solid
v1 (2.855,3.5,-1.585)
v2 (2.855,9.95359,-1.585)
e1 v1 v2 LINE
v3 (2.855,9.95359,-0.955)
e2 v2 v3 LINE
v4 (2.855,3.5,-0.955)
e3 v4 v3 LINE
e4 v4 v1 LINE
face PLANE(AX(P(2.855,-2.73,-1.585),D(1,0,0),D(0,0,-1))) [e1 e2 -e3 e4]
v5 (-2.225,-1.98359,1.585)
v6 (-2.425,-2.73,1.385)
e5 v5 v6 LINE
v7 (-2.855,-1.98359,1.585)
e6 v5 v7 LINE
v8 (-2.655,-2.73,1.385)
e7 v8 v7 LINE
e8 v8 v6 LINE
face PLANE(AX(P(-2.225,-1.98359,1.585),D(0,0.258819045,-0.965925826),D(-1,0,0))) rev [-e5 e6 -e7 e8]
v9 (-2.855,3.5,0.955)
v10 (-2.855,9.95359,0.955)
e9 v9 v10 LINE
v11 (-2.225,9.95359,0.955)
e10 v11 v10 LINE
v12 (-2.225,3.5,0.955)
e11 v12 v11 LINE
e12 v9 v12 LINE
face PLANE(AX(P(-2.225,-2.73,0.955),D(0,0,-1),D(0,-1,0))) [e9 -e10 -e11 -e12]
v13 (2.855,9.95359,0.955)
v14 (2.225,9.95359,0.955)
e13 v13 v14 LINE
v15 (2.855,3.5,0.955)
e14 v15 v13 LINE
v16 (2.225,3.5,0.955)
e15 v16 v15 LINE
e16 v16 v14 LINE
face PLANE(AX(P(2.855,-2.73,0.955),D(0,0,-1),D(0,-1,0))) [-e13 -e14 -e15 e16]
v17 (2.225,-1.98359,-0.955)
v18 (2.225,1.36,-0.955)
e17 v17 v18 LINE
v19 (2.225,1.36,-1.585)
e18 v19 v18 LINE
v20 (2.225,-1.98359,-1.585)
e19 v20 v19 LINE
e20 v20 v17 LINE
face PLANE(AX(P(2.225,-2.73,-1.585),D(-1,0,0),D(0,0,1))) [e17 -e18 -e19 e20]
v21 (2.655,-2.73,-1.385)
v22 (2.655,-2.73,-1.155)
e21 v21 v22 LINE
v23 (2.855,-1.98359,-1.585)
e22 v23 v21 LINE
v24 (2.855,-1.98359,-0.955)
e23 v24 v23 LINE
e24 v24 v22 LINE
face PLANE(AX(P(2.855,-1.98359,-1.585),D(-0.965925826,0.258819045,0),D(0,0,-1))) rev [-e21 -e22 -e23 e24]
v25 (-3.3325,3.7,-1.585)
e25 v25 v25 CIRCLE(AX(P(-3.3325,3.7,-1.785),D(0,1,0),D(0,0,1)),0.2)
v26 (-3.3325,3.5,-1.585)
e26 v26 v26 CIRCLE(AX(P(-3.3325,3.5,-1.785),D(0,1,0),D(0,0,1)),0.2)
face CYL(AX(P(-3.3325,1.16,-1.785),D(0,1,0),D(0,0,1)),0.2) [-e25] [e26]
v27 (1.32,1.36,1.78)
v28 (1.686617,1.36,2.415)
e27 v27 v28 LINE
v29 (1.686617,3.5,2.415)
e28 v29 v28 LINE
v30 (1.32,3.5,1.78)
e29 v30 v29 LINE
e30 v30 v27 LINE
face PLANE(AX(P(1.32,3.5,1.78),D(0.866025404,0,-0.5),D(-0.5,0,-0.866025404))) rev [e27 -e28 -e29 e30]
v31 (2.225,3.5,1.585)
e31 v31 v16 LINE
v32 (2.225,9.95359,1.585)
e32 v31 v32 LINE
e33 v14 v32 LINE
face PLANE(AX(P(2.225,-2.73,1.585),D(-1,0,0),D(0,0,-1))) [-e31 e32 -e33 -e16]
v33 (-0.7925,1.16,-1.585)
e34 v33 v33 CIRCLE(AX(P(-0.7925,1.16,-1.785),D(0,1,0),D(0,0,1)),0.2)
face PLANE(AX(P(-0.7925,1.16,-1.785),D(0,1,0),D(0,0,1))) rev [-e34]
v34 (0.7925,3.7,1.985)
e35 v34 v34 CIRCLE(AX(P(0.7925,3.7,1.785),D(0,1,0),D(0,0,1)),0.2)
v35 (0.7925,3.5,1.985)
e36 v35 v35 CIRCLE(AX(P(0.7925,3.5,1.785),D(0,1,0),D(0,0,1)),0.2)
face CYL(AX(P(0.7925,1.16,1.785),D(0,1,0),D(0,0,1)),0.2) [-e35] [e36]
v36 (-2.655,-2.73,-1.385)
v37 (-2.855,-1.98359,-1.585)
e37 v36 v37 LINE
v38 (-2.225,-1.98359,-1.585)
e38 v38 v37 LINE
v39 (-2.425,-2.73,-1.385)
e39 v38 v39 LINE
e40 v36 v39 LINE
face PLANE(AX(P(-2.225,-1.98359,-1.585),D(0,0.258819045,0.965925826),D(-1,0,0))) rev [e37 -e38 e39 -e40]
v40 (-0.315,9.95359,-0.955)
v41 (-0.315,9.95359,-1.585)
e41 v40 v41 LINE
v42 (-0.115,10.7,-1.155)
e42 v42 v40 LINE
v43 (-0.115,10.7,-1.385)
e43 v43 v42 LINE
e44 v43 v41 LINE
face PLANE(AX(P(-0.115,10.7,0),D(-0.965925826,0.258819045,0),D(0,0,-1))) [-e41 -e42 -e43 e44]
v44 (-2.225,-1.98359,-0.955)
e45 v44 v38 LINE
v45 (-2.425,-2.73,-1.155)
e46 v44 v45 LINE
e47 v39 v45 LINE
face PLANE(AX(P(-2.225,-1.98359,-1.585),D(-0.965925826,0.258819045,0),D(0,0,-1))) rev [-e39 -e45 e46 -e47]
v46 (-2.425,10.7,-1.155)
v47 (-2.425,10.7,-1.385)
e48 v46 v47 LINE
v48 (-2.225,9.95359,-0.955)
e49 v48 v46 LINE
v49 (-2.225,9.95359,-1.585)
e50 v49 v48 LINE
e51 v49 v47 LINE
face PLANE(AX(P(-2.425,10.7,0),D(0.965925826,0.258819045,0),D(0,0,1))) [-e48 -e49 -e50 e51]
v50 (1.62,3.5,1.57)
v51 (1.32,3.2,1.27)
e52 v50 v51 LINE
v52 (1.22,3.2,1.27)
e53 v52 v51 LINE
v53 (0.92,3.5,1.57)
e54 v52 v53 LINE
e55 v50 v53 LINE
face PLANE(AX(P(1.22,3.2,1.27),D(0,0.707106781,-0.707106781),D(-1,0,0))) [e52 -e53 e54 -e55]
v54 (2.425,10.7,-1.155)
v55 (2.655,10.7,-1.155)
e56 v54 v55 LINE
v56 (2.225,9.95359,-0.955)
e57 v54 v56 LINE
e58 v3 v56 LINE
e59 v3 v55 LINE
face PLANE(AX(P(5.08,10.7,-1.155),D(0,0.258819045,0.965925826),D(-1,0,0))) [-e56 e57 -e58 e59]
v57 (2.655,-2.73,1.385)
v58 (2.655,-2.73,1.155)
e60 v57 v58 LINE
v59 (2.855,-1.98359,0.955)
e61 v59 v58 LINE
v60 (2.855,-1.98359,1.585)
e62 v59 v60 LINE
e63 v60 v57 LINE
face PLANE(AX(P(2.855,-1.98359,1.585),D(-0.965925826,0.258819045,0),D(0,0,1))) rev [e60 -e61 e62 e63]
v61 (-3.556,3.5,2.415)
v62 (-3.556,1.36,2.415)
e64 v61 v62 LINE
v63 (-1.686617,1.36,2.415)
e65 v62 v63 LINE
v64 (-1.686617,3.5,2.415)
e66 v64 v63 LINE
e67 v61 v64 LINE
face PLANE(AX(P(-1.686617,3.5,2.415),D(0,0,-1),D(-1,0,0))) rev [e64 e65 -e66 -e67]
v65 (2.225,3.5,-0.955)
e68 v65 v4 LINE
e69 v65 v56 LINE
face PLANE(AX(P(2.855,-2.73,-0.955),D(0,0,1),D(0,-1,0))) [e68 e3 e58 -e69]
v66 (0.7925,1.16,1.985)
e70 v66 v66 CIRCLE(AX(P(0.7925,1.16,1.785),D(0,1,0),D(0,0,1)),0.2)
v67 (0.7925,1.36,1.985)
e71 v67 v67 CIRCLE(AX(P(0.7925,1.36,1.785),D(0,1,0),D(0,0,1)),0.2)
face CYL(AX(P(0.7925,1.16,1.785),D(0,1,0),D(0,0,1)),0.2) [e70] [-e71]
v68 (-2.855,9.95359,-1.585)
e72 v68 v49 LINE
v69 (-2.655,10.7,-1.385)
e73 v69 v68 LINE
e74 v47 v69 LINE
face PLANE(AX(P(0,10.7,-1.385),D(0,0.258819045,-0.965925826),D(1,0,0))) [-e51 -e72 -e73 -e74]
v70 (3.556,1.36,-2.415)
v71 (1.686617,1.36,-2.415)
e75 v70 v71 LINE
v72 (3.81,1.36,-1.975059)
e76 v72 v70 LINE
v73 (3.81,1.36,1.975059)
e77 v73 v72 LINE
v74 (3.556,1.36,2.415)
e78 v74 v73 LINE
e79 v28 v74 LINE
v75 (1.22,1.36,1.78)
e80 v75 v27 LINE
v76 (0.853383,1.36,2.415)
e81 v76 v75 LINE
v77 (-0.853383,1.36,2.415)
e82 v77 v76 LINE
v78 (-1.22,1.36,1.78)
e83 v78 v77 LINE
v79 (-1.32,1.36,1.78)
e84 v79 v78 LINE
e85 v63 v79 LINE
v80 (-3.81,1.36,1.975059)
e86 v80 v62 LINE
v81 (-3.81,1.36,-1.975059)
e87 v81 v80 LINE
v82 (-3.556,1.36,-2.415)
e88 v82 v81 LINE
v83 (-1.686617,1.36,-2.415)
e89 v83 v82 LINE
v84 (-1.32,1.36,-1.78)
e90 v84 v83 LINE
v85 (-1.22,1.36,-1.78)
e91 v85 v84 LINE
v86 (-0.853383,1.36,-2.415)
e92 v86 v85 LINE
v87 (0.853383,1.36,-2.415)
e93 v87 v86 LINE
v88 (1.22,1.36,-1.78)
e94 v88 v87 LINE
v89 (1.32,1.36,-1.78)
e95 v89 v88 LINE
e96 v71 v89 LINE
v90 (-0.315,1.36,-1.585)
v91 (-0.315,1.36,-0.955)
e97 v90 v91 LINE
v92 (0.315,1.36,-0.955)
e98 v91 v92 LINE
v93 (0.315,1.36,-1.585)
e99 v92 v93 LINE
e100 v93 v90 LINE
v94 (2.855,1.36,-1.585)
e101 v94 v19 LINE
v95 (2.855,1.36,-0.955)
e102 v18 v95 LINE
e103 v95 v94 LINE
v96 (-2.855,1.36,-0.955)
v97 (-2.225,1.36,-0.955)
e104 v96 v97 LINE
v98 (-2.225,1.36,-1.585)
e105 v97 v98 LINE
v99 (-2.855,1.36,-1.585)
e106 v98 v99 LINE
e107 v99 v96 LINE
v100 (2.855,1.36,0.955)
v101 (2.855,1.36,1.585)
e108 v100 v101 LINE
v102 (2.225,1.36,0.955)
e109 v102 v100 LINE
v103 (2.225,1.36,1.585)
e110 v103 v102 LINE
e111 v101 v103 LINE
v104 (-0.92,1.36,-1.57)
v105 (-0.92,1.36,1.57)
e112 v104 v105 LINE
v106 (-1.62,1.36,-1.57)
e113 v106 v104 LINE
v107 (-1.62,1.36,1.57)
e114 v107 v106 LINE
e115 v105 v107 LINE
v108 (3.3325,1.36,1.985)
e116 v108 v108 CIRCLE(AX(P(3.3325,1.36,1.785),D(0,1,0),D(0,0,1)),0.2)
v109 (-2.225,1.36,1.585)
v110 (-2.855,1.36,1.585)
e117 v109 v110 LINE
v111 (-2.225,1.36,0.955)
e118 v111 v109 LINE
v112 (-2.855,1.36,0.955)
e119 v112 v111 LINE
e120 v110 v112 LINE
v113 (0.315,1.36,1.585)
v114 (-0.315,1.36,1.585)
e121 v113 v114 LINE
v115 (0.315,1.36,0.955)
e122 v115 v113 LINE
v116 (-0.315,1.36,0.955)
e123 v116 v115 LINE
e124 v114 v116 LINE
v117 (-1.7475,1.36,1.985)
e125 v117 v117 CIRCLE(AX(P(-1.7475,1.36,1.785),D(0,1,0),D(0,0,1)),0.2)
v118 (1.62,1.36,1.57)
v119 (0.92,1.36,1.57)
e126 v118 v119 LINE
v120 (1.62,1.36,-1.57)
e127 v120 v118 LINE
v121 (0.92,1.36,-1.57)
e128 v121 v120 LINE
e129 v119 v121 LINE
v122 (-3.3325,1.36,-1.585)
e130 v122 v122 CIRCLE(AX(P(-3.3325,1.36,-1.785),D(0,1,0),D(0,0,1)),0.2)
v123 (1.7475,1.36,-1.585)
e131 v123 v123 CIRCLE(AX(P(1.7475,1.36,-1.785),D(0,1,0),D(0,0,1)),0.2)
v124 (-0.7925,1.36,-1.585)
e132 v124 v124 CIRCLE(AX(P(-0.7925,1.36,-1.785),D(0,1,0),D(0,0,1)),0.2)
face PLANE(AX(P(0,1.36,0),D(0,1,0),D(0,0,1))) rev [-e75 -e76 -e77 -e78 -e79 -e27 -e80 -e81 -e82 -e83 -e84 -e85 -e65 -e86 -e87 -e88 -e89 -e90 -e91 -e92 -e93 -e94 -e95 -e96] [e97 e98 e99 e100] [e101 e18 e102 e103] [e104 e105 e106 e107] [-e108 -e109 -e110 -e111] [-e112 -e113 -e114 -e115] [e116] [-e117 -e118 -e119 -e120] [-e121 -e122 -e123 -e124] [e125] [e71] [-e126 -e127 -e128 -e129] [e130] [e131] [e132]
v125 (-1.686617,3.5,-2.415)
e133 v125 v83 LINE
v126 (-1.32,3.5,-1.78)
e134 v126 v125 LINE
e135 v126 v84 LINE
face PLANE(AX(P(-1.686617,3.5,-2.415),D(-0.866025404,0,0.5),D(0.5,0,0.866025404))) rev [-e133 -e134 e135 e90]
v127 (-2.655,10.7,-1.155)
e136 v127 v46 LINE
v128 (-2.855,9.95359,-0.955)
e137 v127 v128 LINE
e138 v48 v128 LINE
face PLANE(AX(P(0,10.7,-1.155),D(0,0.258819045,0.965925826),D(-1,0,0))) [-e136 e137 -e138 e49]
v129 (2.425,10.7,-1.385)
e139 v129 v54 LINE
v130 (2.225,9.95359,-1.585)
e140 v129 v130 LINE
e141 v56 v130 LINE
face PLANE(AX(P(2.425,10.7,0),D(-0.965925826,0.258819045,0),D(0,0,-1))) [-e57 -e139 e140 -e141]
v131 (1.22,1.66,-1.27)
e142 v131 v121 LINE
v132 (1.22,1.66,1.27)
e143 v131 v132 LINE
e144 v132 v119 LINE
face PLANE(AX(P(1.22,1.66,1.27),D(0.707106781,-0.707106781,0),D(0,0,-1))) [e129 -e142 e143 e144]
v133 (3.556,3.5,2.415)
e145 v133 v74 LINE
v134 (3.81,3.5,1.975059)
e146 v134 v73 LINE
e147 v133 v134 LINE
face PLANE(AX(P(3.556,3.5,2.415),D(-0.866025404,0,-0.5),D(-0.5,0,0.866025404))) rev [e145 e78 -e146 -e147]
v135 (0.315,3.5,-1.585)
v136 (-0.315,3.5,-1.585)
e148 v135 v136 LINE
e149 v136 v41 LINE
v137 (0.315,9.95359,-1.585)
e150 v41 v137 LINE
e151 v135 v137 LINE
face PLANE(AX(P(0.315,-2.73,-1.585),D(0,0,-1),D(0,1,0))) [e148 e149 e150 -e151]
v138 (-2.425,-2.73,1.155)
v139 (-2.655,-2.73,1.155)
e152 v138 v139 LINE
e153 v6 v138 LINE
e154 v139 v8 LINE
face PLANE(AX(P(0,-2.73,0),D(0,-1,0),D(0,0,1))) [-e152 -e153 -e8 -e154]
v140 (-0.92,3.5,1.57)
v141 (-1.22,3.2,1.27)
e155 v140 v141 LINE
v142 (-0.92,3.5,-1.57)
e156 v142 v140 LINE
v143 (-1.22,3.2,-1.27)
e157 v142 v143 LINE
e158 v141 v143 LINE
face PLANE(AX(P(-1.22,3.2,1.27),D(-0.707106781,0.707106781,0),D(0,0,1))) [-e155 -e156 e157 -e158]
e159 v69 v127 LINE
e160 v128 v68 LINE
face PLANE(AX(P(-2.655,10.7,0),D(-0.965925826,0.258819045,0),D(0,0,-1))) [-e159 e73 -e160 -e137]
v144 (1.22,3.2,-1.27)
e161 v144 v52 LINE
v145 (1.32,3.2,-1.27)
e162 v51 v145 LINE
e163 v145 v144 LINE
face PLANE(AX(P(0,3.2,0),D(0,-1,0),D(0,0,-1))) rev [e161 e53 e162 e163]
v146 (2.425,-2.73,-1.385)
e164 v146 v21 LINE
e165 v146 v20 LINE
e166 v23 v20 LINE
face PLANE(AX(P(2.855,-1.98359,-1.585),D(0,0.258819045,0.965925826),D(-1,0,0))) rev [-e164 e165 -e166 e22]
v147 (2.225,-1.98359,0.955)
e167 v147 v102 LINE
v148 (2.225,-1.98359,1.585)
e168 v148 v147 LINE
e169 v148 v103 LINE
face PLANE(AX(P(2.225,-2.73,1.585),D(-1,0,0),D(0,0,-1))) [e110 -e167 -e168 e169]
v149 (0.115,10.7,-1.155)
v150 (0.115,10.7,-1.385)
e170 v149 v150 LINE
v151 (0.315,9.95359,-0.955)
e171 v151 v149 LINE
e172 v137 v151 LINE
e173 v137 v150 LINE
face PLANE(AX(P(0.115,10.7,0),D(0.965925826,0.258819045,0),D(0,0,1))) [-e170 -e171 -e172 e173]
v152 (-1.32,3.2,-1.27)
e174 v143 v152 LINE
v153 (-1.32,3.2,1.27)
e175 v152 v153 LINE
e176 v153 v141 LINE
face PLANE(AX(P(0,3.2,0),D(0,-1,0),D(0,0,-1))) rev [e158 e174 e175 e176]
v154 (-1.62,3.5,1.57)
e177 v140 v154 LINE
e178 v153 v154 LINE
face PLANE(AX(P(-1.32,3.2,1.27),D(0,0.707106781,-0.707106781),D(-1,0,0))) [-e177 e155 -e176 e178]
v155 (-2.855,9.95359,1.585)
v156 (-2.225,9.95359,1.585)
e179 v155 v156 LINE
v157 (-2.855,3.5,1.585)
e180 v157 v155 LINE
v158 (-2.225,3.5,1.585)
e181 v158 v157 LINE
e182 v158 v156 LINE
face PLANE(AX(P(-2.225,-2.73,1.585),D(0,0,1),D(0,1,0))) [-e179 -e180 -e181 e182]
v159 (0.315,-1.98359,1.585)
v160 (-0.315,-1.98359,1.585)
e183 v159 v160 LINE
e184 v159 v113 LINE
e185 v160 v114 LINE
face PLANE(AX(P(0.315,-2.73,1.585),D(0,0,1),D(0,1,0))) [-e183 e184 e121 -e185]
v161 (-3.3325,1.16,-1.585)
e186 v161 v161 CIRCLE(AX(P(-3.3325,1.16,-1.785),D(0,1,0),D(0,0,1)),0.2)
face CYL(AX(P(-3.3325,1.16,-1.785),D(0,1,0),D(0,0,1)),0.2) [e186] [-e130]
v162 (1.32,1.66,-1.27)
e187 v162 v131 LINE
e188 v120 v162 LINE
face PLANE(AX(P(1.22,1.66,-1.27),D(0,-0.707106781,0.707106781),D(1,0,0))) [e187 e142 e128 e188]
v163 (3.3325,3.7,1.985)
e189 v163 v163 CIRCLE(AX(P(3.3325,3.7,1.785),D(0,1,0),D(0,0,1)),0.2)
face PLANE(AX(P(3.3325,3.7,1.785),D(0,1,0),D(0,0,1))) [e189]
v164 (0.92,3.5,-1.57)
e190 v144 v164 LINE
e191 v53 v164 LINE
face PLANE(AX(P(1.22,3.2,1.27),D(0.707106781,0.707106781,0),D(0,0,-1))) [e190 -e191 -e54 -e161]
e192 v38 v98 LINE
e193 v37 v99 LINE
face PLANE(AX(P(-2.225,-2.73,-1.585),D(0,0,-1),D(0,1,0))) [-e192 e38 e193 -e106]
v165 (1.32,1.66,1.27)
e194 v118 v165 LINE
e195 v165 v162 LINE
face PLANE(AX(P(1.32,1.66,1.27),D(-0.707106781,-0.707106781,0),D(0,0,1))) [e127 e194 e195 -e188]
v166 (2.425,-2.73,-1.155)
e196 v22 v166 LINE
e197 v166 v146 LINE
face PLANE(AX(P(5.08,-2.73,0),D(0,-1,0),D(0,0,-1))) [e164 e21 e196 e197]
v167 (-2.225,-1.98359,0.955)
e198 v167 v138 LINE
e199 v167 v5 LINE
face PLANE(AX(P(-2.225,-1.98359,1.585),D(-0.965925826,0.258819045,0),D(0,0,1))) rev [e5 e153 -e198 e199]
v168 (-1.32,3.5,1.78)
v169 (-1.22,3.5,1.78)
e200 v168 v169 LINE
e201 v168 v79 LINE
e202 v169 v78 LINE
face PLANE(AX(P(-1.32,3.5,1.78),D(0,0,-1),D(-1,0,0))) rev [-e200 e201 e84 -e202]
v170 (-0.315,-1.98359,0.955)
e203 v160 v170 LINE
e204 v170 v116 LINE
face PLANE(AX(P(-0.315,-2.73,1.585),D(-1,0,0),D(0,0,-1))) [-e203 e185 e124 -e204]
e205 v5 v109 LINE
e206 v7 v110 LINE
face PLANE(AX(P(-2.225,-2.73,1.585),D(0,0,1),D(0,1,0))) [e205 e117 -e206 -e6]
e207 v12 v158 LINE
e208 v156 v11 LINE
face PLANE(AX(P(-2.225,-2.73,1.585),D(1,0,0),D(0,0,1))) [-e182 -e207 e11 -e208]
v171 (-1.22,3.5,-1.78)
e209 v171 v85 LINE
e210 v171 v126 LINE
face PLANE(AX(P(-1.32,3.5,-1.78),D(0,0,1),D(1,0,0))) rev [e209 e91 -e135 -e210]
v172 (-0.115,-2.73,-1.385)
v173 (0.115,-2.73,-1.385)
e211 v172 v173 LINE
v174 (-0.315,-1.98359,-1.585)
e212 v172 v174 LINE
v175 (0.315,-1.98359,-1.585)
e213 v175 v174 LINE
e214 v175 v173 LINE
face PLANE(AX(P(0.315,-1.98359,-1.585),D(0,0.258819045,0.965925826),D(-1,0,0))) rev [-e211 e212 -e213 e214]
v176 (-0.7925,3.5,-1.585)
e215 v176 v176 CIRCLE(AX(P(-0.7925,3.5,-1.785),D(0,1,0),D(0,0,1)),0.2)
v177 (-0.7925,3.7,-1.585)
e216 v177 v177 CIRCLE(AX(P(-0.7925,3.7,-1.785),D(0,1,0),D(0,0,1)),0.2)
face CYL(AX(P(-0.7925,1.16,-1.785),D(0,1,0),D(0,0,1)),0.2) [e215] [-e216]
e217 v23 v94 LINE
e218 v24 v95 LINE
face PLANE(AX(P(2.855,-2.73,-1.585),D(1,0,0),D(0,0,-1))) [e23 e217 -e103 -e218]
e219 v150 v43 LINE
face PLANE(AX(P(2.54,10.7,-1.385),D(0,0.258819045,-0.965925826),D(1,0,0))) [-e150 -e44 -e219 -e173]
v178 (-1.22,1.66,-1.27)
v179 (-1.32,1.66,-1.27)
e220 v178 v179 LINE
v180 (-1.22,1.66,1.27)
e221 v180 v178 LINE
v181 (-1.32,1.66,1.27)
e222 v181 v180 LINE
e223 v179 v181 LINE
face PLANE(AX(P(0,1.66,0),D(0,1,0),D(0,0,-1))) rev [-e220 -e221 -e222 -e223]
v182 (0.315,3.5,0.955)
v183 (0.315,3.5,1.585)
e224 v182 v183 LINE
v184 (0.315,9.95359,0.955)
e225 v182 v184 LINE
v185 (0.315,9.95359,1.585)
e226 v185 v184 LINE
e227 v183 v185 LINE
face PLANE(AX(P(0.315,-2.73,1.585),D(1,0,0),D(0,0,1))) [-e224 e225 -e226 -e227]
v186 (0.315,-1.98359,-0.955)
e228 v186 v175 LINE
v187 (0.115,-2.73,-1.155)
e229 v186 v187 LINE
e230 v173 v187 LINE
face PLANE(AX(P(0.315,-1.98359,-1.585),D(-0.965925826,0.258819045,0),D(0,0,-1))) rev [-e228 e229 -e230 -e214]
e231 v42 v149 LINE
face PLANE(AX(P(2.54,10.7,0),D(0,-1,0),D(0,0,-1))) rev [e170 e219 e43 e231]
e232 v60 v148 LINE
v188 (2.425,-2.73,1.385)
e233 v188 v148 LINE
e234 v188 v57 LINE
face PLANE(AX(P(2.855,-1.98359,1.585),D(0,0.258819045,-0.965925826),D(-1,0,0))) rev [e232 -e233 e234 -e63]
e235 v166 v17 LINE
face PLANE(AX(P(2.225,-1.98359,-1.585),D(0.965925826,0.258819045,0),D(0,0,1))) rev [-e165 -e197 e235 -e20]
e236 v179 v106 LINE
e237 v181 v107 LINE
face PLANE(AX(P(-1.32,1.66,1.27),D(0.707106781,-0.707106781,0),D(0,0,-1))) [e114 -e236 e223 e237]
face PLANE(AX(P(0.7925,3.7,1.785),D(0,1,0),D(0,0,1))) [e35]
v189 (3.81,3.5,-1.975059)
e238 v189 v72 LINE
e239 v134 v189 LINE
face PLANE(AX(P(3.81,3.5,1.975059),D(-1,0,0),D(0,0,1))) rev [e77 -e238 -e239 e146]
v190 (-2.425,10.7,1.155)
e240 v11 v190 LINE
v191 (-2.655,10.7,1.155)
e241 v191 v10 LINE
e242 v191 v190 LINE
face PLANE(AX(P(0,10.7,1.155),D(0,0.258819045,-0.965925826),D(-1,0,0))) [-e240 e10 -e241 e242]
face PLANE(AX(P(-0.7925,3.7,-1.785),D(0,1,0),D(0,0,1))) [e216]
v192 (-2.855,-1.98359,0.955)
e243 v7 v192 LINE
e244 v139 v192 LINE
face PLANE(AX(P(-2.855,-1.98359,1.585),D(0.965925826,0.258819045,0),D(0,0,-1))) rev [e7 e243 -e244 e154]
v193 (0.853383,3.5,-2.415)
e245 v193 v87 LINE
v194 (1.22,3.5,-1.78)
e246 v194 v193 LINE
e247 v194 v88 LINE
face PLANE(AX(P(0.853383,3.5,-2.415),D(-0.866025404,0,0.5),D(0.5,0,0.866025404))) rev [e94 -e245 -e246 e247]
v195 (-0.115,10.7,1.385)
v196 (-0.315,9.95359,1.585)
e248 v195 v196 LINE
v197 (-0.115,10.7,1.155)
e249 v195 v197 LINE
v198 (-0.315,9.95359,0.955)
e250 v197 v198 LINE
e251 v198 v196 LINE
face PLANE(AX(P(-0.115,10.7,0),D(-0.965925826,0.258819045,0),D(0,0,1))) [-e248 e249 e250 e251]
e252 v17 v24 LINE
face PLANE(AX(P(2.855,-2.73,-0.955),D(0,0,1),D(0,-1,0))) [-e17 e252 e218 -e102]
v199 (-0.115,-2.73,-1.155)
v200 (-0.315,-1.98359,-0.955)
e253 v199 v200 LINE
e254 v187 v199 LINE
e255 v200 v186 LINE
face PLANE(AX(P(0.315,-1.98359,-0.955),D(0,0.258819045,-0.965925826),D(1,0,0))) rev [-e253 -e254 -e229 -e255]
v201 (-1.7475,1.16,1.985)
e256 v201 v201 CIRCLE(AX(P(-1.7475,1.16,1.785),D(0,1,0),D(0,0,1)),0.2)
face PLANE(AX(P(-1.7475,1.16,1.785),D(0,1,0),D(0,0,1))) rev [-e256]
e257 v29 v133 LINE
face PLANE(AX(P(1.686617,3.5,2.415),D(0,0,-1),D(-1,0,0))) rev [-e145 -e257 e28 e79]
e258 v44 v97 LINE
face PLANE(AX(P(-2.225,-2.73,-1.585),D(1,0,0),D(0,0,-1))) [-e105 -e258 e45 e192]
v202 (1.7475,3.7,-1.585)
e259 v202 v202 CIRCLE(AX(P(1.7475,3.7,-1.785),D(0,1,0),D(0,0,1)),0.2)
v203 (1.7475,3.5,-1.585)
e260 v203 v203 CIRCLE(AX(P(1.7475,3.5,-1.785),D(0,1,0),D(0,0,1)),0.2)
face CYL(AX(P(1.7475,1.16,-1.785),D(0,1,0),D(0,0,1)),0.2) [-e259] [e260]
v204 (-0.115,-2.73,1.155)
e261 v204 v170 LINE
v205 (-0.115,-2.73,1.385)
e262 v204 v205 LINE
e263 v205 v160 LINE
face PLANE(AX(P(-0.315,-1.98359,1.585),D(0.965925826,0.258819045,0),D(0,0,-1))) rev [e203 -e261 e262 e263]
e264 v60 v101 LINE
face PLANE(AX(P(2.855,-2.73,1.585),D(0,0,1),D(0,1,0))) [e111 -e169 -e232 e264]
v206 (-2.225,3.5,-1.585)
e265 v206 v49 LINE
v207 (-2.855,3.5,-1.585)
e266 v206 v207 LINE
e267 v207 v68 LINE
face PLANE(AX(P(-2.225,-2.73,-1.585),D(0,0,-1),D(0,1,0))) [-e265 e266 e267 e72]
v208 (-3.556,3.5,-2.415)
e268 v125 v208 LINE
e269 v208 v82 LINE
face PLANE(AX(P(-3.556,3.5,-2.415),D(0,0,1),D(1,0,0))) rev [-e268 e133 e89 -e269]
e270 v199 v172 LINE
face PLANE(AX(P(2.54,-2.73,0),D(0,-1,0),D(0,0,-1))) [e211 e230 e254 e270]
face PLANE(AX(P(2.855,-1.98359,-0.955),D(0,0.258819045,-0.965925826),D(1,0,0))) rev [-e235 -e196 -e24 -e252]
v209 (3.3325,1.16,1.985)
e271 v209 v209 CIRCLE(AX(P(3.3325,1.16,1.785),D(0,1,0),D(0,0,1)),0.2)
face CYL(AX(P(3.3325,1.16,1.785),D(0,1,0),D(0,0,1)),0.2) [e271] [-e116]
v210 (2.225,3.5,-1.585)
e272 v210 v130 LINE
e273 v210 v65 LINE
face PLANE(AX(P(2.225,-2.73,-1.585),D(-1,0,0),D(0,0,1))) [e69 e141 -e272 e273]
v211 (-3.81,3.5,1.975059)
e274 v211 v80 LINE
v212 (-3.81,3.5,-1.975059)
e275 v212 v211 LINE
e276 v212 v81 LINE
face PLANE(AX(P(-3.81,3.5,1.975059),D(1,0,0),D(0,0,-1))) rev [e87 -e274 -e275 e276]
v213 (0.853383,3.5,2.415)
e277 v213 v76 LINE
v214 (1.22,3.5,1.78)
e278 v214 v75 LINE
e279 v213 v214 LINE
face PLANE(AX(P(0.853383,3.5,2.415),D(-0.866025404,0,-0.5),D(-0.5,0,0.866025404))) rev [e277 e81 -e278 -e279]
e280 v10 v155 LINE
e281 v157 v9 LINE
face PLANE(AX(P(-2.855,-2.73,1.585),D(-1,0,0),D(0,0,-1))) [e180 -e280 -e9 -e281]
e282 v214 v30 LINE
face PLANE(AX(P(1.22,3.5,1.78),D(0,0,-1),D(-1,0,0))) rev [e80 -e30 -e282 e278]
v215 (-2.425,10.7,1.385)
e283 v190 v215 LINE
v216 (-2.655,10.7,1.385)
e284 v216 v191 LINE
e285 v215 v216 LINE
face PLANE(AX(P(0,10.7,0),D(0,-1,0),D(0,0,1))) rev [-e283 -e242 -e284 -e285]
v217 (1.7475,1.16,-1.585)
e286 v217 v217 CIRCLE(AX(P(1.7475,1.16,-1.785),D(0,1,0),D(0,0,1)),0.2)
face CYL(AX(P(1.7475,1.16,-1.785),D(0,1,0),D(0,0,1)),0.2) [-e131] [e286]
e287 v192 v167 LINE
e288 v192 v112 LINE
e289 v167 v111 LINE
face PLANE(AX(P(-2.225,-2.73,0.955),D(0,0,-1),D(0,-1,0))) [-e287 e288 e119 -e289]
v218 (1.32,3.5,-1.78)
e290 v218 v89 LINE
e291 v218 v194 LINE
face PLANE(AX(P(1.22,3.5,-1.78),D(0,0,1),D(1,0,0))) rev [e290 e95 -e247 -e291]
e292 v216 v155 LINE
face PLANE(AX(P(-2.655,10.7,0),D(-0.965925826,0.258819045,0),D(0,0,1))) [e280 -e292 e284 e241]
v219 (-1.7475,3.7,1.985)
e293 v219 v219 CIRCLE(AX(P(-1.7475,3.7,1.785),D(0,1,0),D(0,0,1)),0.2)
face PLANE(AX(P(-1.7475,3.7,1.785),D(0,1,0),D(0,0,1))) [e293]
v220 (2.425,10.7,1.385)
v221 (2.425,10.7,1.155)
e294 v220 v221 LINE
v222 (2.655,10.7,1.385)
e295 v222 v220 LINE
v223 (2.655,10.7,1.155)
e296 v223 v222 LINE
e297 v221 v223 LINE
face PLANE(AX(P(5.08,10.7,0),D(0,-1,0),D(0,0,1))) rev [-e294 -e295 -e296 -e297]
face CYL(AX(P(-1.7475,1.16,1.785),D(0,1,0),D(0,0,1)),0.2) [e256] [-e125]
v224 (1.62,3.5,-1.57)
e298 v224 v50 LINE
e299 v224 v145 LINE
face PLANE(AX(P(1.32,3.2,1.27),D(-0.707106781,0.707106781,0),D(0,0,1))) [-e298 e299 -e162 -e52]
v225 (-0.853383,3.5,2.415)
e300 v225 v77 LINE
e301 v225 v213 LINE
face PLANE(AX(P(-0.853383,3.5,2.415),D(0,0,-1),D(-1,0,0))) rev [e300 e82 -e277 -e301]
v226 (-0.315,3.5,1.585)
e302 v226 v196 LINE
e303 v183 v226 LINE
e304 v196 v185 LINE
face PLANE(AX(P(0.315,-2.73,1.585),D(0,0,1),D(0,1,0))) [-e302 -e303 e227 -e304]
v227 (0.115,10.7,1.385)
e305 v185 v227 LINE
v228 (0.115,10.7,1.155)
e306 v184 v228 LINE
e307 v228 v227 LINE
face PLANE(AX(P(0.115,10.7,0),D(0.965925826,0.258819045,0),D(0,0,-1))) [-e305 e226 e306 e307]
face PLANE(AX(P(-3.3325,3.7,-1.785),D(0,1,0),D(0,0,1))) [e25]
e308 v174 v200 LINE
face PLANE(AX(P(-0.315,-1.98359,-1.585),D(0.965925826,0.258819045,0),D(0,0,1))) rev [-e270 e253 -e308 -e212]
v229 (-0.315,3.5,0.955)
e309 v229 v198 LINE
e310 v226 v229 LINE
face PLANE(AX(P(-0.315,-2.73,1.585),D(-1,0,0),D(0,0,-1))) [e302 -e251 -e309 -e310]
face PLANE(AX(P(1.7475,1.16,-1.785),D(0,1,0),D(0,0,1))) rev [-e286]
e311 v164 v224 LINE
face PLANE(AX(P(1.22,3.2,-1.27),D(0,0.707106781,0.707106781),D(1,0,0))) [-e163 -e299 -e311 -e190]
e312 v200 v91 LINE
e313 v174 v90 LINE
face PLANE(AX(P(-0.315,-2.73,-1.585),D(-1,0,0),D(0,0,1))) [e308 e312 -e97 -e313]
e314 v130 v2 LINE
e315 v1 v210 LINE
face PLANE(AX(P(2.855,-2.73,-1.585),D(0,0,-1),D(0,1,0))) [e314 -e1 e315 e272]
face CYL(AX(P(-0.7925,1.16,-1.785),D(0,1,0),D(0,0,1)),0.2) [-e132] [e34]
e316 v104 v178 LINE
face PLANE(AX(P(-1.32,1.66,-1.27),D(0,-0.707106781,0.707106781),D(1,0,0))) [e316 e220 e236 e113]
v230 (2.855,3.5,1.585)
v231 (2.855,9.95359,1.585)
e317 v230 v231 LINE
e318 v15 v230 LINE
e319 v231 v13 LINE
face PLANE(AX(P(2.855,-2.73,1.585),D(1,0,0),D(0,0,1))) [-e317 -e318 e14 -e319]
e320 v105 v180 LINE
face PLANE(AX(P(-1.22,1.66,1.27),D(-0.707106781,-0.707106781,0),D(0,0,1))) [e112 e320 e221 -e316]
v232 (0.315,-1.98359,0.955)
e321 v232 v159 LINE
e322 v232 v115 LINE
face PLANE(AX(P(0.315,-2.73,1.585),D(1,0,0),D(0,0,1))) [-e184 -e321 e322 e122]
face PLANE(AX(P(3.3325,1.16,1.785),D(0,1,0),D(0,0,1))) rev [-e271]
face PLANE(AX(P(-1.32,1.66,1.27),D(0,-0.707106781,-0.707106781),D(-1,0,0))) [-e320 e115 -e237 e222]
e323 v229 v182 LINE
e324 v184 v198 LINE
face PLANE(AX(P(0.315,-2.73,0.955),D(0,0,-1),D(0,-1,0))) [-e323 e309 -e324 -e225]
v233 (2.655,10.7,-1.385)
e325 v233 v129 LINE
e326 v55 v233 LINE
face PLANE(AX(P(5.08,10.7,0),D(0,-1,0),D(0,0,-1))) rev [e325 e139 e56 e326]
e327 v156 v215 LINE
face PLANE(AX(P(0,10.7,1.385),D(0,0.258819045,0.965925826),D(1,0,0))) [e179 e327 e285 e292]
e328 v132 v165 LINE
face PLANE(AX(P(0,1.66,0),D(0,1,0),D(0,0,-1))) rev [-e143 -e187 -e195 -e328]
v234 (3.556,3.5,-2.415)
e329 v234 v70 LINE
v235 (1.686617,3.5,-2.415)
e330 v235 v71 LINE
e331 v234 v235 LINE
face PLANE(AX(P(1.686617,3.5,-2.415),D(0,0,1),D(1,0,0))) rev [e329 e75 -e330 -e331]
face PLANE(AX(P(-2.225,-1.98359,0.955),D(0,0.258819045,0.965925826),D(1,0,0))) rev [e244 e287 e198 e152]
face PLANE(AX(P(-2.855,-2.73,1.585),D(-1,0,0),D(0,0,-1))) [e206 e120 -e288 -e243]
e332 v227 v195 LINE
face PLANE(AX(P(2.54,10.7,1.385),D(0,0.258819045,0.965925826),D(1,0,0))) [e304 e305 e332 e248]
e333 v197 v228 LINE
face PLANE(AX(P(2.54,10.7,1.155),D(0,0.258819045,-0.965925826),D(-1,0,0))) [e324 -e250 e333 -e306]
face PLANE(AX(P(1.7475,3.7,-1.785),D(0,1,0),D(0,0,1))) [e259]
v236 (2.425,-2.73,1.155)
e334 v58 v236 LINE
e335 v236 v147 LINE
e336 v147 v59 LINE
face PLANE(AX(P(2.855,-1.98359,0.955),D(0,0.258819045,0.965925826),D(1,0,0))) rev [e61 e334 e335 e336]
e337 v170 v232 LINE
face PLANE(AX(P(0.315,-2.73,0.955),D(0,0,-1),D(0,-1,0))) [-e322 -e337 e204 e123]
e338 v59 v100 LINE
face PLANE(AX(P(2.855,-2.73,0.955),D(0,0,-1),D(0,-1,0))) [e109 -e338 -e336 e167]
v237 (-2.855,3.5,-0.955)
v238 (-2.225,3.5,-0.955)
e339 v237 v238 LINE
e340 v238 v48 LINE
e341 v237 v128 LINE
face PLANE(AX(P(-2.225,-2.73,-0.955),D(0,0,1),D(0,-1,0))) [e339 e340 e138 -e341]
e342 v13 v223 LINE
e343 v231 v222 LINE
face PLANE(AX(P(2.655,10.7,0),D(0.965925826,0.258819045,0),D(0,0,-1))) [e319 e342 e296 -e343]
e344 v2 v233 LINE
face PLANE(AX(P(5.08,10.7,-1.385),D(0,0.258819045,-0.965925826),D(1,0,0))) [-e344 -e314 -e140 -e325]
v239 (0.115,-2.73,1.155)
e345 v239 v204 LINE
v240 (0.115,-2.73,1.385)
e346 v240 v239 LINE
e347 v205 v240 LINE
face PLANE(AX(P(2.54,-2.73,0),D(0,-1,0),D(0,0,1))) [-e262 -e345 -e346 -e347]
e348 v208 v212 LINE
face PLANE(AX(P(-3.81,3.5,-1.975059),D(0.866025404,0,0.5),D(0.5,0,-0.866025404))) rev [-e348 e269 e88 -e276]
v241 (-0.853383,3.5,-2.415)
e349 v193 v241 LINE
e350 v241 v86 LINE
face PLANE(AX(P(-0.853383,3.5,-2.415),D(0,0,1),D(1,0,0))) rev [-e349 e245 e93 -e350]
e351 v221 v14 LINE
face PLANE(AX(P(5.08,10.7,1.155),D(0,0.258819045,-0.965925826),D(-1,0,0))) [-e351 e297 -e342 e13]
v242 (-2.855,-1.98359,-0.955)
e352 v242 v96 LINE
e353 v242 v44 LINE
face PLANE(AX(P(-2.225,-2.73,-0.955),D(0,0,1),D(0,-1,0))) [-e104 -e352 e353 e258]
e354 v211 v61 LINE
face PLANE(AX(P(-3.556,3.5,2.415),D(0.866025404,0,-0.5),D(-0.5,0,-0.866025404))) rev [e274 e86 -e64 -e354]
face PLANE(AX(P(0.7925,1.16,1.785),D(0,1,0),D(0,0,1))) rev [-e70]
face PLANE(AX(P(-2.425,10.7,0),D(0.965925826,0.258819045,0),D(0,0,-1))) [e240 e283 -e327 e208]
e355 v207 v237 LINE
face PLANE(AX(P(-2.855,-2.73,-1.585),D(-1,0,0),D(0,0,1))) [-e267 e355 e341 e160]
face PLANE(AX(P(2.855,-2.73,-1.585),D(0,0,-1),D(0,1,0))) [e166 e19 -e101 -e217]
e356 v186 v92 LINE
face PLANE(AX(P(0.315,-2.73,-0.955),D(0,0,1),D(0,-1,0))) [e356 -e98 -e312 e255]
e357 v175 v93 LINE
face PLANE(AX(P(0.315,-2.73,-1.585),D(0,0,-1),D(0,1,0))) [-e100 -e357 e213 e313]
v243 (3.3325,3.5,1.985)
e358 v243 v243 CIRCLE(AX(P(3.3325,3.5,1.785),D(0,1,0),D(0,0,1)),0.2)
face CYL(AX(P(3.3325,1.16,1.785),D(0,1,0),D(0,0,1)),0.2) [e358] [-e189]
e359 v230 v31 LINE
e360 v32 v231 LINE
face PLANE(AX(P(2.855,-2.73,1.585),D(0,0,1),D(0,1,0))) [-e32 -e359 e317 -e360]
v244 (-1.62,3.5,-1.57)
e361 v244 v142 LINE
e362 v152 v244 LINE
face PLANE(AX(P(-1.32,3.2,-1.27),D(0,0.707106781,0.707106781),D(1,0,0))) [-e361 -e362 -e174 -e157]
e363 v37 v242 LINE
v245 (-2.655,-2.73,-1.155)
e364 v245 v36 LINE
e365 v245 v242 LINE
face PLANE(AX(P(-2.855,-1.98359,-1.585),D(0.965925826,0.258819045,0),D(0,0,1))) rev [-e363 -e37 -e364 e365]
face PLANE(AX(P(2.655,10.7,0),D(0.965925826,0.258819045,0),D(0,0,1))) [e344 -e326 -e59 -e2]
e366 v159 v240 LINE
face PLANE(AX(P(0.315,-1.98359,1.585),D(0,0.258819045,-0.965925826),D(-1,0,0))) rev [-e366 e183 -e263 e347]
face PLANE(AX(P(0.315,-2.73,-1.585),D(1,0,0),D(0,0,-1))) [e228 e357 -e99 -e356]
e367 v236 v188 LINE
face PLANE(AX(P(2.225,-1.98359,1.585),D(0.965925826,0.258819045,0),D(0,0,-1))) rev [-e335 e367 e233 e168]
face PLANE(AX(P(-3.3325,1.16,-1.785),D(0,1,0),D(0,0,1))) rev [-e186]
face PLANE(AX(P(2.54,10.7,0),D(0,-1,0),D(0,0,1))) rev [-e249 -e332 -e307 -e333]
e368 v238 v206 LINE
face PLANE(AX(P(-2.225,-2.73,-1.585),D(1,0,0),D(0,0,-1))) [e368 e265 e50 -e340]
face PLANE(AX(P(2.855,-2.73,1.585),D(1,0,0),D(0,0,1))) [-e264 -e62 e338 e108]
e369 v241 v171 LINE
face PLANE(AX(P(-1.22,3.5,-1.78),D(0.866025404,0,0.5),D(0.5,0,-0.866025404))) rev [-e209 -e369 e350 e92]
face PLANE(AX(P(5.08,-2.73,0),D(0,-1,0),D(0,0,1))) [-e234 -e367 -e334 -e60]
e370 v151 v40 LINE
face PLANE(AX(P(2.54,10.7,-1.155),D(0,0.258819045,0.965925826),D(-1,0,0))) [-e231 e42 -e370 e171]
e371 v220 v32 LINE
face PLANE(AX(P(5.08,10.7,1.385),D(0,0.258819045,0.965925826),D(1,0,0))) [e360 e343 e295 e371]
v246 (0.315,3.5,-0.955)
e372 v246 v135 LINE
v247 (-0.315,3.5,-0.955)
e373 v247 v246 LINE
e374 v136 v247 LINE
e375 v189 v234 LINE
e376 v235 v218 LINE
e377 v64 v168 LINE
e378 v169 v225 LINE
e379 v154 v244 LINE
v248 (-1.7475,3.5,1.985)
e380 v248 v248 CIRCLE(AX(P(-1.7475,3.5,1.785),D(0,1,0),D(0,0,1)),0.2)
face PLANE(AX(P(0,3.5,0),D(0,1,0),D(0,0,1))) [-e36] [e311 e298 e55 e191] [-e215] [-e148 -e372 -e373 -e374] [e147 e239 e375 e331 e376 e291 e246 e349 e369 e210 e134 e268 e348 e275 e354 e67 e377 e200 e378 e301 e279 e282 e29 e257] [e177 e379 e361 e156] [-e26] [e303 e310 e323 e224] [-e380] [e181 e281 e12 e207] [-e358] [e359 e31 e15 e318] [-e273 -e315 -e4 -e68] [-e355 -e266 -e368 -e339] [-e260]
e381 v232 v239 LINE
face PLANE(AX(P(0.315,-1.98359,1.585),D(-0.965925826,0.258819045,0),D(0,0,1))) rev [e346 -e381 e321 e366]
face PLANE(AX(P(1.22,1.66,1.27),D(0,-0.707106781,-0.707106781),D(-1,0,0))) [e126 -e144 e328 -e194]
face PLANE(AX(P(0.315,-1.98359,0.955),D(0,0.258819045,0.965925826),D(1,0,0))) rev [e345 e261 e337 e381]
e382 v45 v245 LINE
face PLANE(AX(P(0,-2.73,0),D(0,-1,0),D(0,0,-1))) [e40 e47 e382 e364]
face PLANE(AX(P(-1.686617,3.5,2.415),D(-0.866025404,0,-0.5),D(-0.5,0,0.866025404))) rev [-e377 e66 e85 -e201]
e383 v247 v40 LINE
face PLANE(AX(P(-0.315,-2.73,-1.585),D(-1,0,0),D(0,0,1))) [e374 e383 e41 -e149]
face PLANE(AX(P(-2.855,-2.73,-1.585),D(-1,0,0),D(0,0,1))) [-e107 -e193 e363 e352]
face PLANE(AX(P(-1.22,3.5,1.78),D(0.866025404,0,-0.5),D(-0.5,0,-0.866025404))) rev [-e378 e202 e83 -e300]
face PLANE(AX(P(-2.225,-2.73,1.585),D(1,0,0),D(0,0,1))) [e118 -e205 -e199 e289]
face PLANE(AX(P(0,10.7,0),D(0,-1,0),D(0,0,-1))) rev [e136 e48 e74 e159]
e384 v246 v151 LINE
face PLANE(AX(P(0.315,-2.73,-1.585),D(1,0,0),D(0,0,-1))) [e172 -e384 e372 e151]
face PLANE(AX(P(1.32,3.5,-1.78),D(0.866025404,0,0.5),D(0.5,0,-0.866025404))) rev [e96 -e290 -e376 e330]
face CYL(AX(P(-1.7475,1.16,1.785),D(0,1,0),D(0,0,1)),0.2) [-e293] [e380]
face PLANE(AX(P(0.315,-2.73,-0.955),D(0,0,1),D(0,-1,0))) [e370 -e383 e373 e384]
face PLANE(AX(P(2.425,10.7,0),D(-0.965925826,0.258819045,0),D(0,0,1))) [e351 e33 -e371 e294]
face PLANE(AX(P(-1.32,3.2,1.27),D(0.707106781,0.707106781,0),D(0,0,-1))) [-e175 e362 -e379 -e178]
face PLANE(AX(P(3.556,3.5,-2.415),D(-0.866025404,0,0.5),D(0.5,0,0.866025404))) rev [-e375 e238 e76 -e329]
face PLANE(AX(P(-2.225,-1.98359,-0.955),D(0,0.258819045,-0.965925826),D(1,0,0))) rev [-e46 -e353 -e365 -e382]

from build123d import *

# Parameters (mm, degrees)
BOSS_EXTRUDE1_DEPTH      = 2.14
BOSS_EXTRUDE2_START      = -2.34
SKETCH2_R                = 0.2
BOSS_EXTRUDE2_DEPTH      = 2.54
LPATTERN1_COUNT          = 3
LPATTERN1_PITCH          = 2.54
SKETCH3_W                = 0.1
SKETCH3_H                = 2.54
CUT_EXTRUDE1_DEPTH       = 0.3
CHAMFER1_SIZE            = 0.3
CHAMFER1_OF_MIRROR2_SIZE = 0.3
SKETCH6_W                = 0.63
SKETCH6_H                = 0.63
CHAMFER2_SIZE            = 0.2
CHAMFER2_SIZE2           = 0.746410162
CHAMFER3_SIZE            = 0.2
CHAMFER3_SIZE2           = 0.746410162
LPATTERN2_START          = -1.585
LPATTERN2_DEPTH          = 0.63
LPATTERN2_START_2        = -1
LPATTERN2_2_DEPTH        = 5
MIRROR4_START            = -2.655
MIRROR4_DEPTH            = 0.23
MIRROR4_START_2          = -0.115
MIRROR4_2_DEPTH          = 0.23
MIRROR4_START_3          = 2.425
MIRROR4_3_DEPTH          = 0.23
MIRROR4_START_4          = 0.955
MIRROR4_4_DEPTH          = 0.63
MIRROR4_START_5          = -4
MIRROR4_5_DEPTH          = 8


with BuildPart() as part:
    # Sketch1 → Boss-Extrude1 (new body)
    with BuildSketch(Plane(origin=(0, 1.36, 0), x_dir=(1, 0, 0), z_dir=(0, 1, 0))):
        Polygon((-1.686617421, 2.415), (-1.32, 1.78), (-1.22, 1.78), (-0.853382579, 2.415), (0.853382579, 2.415), (1.22, 1.78), (1.32, 1.78), (1.686617421, 2.415), (3.556, 2.415), (3.81, 1.975059095), (3.81, -1.975059095), (3.556, -2.415), (1.686617421, -2.415), (1.32, -1.78), (1.22, -1.78), (0.853382579, -2.415), (-0.853382579, -2.415), (-1.22, -1.78), (-1.32, -1.78), (-1.686617421, -2.415), (-3.556, -2.415), (-3.81, -1.975059095), (-3.81, 1.975059095), (-3.556, 2.415), align=None)
    extrude(amount=BOSS_EXTRUDE1_DEPTH)

    # Sketch2 → Boss-Extrude2 (add)
    with BuildSketch(Plane(origin=(0, 3.5, 0), x_dir=(1, 0, 0), z_dir=(0, 1, 0)).offset(BOSS_EXTRUDE2_START)):
        with Locations(Location((-3.3325, 1.785, 0), (0, 0, 270))):
            Circle(SKETCH2_R)
        with Locations(Location((-1.7475, -1.785, 0), (0, 0, 270))):
            Circle(SKETCH2_R)
    boss_extrude2 = extrude(amount=BOSS_EXTRUDE2_DEPTH)

    # LPattern1: Boss-Extrude2 ×3
    with Locations(*[(i * LPATTERN1_PITCH, 0, 0) for i in range(1, LPATTERN1_COUNT)]):
        add(boss_extrude2)

    # Sketch3 → Cut-Extrude1 (cut)
    with BuildSketch(Plane(origin=(0, 3.5, 0), x_dir=(1, 0, 0), z_dir=(0, 1, 0))):
        with Locations((-1.27, 0)):
            Rectangle(SKETCH3_W, SKETCH3_H)
        with Locations((1.27, 0)):
            Rectangle(SKETCH3_W, SKETCH3_H)
    cut_extrude1 = extrude(amount=-CUT_EXTRUDE1_DEPTH, mode=Mode.SUBTRACT)

    # Chamfer1
    chamfer1_edges = [part.edges().sort_by_distance(p)[0] for p in [
        (-1.27, 3.5, 1.27),
        (-1.22, 3.5, 0),
        (-1.27, 3.5, -1.27),
        (-1.32, 3.5, 0),
        (1.27, 3.5, 1.27),
        (1.32, 3.5, 0),
        (1.22, 3.5, 0),
        (1.27, 3.5, -1.27),
    ]]
    chamfer(chamfer1_edges, length=CHAMFER1_SIZE - 0.0001)  # a hair under: the kernel refuses the full size

    # Mirror2: Cut-Extrude1 across plane
    add(cut_extrude1.mirror(Plane.ZX.offset(2.43)), mode=Mode.SUBTRACT)

    # Chamfer1 of Mirror2
    chamfer1_of_mirror2_edges = [part.edges().sort_by_distance(p)[0] for p in [
        (-1.27, 1.36, 1.27),
        (-1.22, 1.36, 0),
        (-1.27, 1.36, -1.27),
        (-1.32, 1.36, 0),
        (1.27, 1.36, 1.27),
        (1.32, 1.36, 0),
        (1.22, 1.36, 0),
        (1.27, 1.36, -1.27),
    ]]
    chamfer(chamfer1_of_mirror2_edges, length=CHAMFER1_OF_MIRROR2_SIZE - 0.0001)  # a hair under: the kernel refuses the full size

    # Sweep1: sweep along a path in Sketch5
    with BuildLine(Plane(origin=(-2.54, 0, 0), x_dir=(0, 0, -1), z_dir=(1, 0, 0))) as sweep1_path:
        Line((1.27, 10.7), (1.27, -2.73))
    # Sketch6 → Sweep1 (sweep)
    with BuildSketch(Plane(origin=(0, 10.7, 0), x_dir=(1, 0, 0), z_dir=(0, 1, 0))):
        with Locations((-2.54, 1.27)):
            Rectangle(SKETCH6_W, SKETCH6_H)
    sweep(path=sweep1_path.line)

    # Chamfer2
    chamfer2_edges = [part.edges().sort_by_distance(p)[0] for p in [
        (-2.225, -2.73, -1.27),
        (-2.54, -2.73, -0.955),
        (-2.855, -2.73, -1.27),
        (-2.54, -2.73, -1.585),
    ]]
    chamfer2_side = [part.faces().sort_by_distance(p)[0] for p in [
        (-2.54, -2.73, -1.27),
    ]]
    chamfer(chamfer2_edges, length=CHAMFER2_SIZE, length2=CHAMFER2_SIZE2, reference=chamfer2_side[0])

    # Chamfer3
    chamfer3_edges = [part.edges().sort_by_distance(p)[0] for p in [
        (-2.225, 10.7, -1.27),
        (-2.54, 10.7, -1.585),
        (-2.855, 10.7, -1.27),
        (-2.54, 10.7, -0.955),
    ]]
    chamfer3_side = [part.faces().sort_by_distance(p)[0] for p in [
        (-2.54, 10.7, -1.27),
    ]]
    chamfer(chamfer3_edges, length=CHAMFER3_SIZE, length2=CHAMFER3_SIZE2, reference=chamfer3_side[0])

    # LPattern2: read off the stored shape, not the designer's step
    # LPattern2 outline → LPattern2 (add)
    with BuildSketch(Plane.XY.offset(LPATTERN2_START)):
        Polygon((2.225, 9.953589838), (2.225, 3.5), (2.855, 3.5), (2.855, 9.953589838), (2.655, 10.7), (2.425, 10.7), align=None)
        Polygon((0.115, 10.7), (-0.115, 10.7), (-0.315, 9.953589838), (-0.315, 3.5), (0.315, 3.5), (0.315, 9.953589838), align=None)
        Polygon((-0.315, -1.983589838), (-0.115, -2.73), (0.115, -2.73), (0.315, -1.983589838), (0.315, 1.36), (-0.315, 1.36), align=None)
        Polygon((2.855, 1.36), (2.225, 1.36), (2.225, -1.983589838), (2.425, -2.73), (2.655, -2.73), (2.855, -1.983589838), align=None)
    extrude(amount=LPATTERN2_DEPTH)

    # LPattern2 2 outline → LPattern2 2 (cut)
    with BuildSketch(Plane.YZ.offset(LPATTERN2_START_2)):
        Polygon((-2.73, -0.955), (-2.73, -1.155), (-1.983589838, -0.955), align=None)
        Polygon((-1.983589838, -1.585), (-2.73, -1.385), (-2.73, -1.585), align=None)
        Polygon((9.953589838, -0.955), (10.7, -1.155), (10.7, -0.955), align=None)
        Polygon((10.7, -1.385), (9.953589838, -1.585), (10.7, -1.585), align=None)
    extrude(amount=LPATTERN2_2_DEPTH, mode=Mode.SUBTRACT)

    # Mirror4: read off the stored shape, not the designer's step
    # Mirror4 outline → Mirror4 (add)
    with BuildSketch(Plane.YZ.offset(MIRROR4_START)):
        Polygon((10.7, 1.155), (10.7, 1.385), (9.953589838, 1.585), (3.5, 1.585), (3.5, 0.955), (9.953589838, 0.955), align=None)
        Polygon((-1.983589838, 1.585), (-2.73, 1.385), (-2.73, 1.155), (-1.983589838, 0.955), (1.36, 0.955), (1.36, 1.585), align=None)
    extrude(amount=MIRROR4_DEPTH)

    # Mirror4 2 outline → Mirror4 2 (add)
    with BuildSketch(Plane.YZ.offset(MIRROR4_START_2)):
        Polygon((10.7, 1.155), (10.7, 1.385), (9.953589838, 1.585), (3.5, 1.585), (3.5, 0.955), (9.953589838, 0.955), align=None)
        Polygon((-1.983589838, 1.585), (-2.73, 1.385), (-2.73, 1.155), (-1.983589838, 0.955), (1.36, 0.955), (1.36, 1.585), align=None)
    extrude(amount=MIRROR4_2_DEPTH)

    # Mirror4 3 outline → Mirror4 3 (add)
    with BuildSketch(Plane.YZ.offset(MIRROR4_START_3)):
        Polygon((10.7, 1.155), (10.7, 1.385), (9.953589838, 1.585), (3.5, 1.585), (3.5, 0.955), (9.953589838, 0.955), align=None)
        Polygon((-1.983589838, 1.585), (-2.73, 1.385), (-2.73, 1.155), (-1.983589838, 0.955), (1.36, 0.955), (1.36, 1.585), align=None)
    extrude(amount=MIRROR4_3_DEPTH)

    # Mirror4 4 outline → Mirror4 4 (add)
    with BuildSketch(Plane.XY.offset(MIRROR4_START_4)):
        Polygon((-2.655, 1.36), (-2.855, 1.36), (-2.855, -1.983589838), (-2.655, -2.73), align=None)
        Polygon((2.855, 1.36), (2.655, 1.36), (2.655, -2.73), (2.855, -1.983589838), align=None)
        Polygon((2.425, 1.36), (2.225, 1.36), (2.225, -1.983589838), (2.425, -2.73), align=None)
        Polygon((0.315, 1.36), (0.115, 1.36), (0.115, -2.73), (0.315, -1.983589838), align=None)
        Polygon((-0.115, 1.36), (-0.315, 1.36), (-0.315, -1.983589838), (-0.115, -2.73), align=None)
        Polygon((-2.225, 1.36), (-2.425, 1.36), (-2.425, -2.73), (-2.225, -1.983589838), align=None)
        Polygon((-2.655, 10.7), (-2.855, 9.953589838), (-2.855, 3.5), (-2.655, 3.5), align=None)
        Polygon((2.655, 10.7), (2.655, 3.5), (2.855, 3.5), (2.855, 9.953589838), align=None)
        Polygon((2.225, 9.953589838), (2.225, 3.5), (2.425, 3.5), (2.425, 10.7), align=None)
        Polygon((0.115, 10.7), (0.115, 3.5), (0.315, 3.5), (0.315, 9.953589838), align=None)
        Polygon((-0.315, 9.953589838), (-0.315, 3.5), (-0.115, 3.5), (-0.115, 10.7), align=None)
        Polygon((-2.425, 10.7), (-2.425, 3.5), (-2.225, 3.5), (-2.225, 9.953589838), align=None)
    extrude(amount=MIRROR4_4_DEPTH)

    # Mirror4 5 outline → Mirror4 5 (cut)
    with BuildSketch(Plane.YZ.offset(MIRROR4_START_5)):
        Polygon((-2.73, 1.155), (-2.73, 0.955), (-1.983589838, 0.955), align=None)
        Polygon((-2.73, 1.585), (-2.73, 1.385), (-1.983589838, 1.585), align=None)
        Polygon((10.7, 1.585), (9.953589838, 1.585), (10.7, 1.385), align=None)
        Polygon((10.7, 1.155), (9.953589838, 0.955), (10.7, 0.955), align=None)
    extrude(amount=MIRROR4_5_DEPTH, mode=Mode.SUBTRACT)


solid = part.part
